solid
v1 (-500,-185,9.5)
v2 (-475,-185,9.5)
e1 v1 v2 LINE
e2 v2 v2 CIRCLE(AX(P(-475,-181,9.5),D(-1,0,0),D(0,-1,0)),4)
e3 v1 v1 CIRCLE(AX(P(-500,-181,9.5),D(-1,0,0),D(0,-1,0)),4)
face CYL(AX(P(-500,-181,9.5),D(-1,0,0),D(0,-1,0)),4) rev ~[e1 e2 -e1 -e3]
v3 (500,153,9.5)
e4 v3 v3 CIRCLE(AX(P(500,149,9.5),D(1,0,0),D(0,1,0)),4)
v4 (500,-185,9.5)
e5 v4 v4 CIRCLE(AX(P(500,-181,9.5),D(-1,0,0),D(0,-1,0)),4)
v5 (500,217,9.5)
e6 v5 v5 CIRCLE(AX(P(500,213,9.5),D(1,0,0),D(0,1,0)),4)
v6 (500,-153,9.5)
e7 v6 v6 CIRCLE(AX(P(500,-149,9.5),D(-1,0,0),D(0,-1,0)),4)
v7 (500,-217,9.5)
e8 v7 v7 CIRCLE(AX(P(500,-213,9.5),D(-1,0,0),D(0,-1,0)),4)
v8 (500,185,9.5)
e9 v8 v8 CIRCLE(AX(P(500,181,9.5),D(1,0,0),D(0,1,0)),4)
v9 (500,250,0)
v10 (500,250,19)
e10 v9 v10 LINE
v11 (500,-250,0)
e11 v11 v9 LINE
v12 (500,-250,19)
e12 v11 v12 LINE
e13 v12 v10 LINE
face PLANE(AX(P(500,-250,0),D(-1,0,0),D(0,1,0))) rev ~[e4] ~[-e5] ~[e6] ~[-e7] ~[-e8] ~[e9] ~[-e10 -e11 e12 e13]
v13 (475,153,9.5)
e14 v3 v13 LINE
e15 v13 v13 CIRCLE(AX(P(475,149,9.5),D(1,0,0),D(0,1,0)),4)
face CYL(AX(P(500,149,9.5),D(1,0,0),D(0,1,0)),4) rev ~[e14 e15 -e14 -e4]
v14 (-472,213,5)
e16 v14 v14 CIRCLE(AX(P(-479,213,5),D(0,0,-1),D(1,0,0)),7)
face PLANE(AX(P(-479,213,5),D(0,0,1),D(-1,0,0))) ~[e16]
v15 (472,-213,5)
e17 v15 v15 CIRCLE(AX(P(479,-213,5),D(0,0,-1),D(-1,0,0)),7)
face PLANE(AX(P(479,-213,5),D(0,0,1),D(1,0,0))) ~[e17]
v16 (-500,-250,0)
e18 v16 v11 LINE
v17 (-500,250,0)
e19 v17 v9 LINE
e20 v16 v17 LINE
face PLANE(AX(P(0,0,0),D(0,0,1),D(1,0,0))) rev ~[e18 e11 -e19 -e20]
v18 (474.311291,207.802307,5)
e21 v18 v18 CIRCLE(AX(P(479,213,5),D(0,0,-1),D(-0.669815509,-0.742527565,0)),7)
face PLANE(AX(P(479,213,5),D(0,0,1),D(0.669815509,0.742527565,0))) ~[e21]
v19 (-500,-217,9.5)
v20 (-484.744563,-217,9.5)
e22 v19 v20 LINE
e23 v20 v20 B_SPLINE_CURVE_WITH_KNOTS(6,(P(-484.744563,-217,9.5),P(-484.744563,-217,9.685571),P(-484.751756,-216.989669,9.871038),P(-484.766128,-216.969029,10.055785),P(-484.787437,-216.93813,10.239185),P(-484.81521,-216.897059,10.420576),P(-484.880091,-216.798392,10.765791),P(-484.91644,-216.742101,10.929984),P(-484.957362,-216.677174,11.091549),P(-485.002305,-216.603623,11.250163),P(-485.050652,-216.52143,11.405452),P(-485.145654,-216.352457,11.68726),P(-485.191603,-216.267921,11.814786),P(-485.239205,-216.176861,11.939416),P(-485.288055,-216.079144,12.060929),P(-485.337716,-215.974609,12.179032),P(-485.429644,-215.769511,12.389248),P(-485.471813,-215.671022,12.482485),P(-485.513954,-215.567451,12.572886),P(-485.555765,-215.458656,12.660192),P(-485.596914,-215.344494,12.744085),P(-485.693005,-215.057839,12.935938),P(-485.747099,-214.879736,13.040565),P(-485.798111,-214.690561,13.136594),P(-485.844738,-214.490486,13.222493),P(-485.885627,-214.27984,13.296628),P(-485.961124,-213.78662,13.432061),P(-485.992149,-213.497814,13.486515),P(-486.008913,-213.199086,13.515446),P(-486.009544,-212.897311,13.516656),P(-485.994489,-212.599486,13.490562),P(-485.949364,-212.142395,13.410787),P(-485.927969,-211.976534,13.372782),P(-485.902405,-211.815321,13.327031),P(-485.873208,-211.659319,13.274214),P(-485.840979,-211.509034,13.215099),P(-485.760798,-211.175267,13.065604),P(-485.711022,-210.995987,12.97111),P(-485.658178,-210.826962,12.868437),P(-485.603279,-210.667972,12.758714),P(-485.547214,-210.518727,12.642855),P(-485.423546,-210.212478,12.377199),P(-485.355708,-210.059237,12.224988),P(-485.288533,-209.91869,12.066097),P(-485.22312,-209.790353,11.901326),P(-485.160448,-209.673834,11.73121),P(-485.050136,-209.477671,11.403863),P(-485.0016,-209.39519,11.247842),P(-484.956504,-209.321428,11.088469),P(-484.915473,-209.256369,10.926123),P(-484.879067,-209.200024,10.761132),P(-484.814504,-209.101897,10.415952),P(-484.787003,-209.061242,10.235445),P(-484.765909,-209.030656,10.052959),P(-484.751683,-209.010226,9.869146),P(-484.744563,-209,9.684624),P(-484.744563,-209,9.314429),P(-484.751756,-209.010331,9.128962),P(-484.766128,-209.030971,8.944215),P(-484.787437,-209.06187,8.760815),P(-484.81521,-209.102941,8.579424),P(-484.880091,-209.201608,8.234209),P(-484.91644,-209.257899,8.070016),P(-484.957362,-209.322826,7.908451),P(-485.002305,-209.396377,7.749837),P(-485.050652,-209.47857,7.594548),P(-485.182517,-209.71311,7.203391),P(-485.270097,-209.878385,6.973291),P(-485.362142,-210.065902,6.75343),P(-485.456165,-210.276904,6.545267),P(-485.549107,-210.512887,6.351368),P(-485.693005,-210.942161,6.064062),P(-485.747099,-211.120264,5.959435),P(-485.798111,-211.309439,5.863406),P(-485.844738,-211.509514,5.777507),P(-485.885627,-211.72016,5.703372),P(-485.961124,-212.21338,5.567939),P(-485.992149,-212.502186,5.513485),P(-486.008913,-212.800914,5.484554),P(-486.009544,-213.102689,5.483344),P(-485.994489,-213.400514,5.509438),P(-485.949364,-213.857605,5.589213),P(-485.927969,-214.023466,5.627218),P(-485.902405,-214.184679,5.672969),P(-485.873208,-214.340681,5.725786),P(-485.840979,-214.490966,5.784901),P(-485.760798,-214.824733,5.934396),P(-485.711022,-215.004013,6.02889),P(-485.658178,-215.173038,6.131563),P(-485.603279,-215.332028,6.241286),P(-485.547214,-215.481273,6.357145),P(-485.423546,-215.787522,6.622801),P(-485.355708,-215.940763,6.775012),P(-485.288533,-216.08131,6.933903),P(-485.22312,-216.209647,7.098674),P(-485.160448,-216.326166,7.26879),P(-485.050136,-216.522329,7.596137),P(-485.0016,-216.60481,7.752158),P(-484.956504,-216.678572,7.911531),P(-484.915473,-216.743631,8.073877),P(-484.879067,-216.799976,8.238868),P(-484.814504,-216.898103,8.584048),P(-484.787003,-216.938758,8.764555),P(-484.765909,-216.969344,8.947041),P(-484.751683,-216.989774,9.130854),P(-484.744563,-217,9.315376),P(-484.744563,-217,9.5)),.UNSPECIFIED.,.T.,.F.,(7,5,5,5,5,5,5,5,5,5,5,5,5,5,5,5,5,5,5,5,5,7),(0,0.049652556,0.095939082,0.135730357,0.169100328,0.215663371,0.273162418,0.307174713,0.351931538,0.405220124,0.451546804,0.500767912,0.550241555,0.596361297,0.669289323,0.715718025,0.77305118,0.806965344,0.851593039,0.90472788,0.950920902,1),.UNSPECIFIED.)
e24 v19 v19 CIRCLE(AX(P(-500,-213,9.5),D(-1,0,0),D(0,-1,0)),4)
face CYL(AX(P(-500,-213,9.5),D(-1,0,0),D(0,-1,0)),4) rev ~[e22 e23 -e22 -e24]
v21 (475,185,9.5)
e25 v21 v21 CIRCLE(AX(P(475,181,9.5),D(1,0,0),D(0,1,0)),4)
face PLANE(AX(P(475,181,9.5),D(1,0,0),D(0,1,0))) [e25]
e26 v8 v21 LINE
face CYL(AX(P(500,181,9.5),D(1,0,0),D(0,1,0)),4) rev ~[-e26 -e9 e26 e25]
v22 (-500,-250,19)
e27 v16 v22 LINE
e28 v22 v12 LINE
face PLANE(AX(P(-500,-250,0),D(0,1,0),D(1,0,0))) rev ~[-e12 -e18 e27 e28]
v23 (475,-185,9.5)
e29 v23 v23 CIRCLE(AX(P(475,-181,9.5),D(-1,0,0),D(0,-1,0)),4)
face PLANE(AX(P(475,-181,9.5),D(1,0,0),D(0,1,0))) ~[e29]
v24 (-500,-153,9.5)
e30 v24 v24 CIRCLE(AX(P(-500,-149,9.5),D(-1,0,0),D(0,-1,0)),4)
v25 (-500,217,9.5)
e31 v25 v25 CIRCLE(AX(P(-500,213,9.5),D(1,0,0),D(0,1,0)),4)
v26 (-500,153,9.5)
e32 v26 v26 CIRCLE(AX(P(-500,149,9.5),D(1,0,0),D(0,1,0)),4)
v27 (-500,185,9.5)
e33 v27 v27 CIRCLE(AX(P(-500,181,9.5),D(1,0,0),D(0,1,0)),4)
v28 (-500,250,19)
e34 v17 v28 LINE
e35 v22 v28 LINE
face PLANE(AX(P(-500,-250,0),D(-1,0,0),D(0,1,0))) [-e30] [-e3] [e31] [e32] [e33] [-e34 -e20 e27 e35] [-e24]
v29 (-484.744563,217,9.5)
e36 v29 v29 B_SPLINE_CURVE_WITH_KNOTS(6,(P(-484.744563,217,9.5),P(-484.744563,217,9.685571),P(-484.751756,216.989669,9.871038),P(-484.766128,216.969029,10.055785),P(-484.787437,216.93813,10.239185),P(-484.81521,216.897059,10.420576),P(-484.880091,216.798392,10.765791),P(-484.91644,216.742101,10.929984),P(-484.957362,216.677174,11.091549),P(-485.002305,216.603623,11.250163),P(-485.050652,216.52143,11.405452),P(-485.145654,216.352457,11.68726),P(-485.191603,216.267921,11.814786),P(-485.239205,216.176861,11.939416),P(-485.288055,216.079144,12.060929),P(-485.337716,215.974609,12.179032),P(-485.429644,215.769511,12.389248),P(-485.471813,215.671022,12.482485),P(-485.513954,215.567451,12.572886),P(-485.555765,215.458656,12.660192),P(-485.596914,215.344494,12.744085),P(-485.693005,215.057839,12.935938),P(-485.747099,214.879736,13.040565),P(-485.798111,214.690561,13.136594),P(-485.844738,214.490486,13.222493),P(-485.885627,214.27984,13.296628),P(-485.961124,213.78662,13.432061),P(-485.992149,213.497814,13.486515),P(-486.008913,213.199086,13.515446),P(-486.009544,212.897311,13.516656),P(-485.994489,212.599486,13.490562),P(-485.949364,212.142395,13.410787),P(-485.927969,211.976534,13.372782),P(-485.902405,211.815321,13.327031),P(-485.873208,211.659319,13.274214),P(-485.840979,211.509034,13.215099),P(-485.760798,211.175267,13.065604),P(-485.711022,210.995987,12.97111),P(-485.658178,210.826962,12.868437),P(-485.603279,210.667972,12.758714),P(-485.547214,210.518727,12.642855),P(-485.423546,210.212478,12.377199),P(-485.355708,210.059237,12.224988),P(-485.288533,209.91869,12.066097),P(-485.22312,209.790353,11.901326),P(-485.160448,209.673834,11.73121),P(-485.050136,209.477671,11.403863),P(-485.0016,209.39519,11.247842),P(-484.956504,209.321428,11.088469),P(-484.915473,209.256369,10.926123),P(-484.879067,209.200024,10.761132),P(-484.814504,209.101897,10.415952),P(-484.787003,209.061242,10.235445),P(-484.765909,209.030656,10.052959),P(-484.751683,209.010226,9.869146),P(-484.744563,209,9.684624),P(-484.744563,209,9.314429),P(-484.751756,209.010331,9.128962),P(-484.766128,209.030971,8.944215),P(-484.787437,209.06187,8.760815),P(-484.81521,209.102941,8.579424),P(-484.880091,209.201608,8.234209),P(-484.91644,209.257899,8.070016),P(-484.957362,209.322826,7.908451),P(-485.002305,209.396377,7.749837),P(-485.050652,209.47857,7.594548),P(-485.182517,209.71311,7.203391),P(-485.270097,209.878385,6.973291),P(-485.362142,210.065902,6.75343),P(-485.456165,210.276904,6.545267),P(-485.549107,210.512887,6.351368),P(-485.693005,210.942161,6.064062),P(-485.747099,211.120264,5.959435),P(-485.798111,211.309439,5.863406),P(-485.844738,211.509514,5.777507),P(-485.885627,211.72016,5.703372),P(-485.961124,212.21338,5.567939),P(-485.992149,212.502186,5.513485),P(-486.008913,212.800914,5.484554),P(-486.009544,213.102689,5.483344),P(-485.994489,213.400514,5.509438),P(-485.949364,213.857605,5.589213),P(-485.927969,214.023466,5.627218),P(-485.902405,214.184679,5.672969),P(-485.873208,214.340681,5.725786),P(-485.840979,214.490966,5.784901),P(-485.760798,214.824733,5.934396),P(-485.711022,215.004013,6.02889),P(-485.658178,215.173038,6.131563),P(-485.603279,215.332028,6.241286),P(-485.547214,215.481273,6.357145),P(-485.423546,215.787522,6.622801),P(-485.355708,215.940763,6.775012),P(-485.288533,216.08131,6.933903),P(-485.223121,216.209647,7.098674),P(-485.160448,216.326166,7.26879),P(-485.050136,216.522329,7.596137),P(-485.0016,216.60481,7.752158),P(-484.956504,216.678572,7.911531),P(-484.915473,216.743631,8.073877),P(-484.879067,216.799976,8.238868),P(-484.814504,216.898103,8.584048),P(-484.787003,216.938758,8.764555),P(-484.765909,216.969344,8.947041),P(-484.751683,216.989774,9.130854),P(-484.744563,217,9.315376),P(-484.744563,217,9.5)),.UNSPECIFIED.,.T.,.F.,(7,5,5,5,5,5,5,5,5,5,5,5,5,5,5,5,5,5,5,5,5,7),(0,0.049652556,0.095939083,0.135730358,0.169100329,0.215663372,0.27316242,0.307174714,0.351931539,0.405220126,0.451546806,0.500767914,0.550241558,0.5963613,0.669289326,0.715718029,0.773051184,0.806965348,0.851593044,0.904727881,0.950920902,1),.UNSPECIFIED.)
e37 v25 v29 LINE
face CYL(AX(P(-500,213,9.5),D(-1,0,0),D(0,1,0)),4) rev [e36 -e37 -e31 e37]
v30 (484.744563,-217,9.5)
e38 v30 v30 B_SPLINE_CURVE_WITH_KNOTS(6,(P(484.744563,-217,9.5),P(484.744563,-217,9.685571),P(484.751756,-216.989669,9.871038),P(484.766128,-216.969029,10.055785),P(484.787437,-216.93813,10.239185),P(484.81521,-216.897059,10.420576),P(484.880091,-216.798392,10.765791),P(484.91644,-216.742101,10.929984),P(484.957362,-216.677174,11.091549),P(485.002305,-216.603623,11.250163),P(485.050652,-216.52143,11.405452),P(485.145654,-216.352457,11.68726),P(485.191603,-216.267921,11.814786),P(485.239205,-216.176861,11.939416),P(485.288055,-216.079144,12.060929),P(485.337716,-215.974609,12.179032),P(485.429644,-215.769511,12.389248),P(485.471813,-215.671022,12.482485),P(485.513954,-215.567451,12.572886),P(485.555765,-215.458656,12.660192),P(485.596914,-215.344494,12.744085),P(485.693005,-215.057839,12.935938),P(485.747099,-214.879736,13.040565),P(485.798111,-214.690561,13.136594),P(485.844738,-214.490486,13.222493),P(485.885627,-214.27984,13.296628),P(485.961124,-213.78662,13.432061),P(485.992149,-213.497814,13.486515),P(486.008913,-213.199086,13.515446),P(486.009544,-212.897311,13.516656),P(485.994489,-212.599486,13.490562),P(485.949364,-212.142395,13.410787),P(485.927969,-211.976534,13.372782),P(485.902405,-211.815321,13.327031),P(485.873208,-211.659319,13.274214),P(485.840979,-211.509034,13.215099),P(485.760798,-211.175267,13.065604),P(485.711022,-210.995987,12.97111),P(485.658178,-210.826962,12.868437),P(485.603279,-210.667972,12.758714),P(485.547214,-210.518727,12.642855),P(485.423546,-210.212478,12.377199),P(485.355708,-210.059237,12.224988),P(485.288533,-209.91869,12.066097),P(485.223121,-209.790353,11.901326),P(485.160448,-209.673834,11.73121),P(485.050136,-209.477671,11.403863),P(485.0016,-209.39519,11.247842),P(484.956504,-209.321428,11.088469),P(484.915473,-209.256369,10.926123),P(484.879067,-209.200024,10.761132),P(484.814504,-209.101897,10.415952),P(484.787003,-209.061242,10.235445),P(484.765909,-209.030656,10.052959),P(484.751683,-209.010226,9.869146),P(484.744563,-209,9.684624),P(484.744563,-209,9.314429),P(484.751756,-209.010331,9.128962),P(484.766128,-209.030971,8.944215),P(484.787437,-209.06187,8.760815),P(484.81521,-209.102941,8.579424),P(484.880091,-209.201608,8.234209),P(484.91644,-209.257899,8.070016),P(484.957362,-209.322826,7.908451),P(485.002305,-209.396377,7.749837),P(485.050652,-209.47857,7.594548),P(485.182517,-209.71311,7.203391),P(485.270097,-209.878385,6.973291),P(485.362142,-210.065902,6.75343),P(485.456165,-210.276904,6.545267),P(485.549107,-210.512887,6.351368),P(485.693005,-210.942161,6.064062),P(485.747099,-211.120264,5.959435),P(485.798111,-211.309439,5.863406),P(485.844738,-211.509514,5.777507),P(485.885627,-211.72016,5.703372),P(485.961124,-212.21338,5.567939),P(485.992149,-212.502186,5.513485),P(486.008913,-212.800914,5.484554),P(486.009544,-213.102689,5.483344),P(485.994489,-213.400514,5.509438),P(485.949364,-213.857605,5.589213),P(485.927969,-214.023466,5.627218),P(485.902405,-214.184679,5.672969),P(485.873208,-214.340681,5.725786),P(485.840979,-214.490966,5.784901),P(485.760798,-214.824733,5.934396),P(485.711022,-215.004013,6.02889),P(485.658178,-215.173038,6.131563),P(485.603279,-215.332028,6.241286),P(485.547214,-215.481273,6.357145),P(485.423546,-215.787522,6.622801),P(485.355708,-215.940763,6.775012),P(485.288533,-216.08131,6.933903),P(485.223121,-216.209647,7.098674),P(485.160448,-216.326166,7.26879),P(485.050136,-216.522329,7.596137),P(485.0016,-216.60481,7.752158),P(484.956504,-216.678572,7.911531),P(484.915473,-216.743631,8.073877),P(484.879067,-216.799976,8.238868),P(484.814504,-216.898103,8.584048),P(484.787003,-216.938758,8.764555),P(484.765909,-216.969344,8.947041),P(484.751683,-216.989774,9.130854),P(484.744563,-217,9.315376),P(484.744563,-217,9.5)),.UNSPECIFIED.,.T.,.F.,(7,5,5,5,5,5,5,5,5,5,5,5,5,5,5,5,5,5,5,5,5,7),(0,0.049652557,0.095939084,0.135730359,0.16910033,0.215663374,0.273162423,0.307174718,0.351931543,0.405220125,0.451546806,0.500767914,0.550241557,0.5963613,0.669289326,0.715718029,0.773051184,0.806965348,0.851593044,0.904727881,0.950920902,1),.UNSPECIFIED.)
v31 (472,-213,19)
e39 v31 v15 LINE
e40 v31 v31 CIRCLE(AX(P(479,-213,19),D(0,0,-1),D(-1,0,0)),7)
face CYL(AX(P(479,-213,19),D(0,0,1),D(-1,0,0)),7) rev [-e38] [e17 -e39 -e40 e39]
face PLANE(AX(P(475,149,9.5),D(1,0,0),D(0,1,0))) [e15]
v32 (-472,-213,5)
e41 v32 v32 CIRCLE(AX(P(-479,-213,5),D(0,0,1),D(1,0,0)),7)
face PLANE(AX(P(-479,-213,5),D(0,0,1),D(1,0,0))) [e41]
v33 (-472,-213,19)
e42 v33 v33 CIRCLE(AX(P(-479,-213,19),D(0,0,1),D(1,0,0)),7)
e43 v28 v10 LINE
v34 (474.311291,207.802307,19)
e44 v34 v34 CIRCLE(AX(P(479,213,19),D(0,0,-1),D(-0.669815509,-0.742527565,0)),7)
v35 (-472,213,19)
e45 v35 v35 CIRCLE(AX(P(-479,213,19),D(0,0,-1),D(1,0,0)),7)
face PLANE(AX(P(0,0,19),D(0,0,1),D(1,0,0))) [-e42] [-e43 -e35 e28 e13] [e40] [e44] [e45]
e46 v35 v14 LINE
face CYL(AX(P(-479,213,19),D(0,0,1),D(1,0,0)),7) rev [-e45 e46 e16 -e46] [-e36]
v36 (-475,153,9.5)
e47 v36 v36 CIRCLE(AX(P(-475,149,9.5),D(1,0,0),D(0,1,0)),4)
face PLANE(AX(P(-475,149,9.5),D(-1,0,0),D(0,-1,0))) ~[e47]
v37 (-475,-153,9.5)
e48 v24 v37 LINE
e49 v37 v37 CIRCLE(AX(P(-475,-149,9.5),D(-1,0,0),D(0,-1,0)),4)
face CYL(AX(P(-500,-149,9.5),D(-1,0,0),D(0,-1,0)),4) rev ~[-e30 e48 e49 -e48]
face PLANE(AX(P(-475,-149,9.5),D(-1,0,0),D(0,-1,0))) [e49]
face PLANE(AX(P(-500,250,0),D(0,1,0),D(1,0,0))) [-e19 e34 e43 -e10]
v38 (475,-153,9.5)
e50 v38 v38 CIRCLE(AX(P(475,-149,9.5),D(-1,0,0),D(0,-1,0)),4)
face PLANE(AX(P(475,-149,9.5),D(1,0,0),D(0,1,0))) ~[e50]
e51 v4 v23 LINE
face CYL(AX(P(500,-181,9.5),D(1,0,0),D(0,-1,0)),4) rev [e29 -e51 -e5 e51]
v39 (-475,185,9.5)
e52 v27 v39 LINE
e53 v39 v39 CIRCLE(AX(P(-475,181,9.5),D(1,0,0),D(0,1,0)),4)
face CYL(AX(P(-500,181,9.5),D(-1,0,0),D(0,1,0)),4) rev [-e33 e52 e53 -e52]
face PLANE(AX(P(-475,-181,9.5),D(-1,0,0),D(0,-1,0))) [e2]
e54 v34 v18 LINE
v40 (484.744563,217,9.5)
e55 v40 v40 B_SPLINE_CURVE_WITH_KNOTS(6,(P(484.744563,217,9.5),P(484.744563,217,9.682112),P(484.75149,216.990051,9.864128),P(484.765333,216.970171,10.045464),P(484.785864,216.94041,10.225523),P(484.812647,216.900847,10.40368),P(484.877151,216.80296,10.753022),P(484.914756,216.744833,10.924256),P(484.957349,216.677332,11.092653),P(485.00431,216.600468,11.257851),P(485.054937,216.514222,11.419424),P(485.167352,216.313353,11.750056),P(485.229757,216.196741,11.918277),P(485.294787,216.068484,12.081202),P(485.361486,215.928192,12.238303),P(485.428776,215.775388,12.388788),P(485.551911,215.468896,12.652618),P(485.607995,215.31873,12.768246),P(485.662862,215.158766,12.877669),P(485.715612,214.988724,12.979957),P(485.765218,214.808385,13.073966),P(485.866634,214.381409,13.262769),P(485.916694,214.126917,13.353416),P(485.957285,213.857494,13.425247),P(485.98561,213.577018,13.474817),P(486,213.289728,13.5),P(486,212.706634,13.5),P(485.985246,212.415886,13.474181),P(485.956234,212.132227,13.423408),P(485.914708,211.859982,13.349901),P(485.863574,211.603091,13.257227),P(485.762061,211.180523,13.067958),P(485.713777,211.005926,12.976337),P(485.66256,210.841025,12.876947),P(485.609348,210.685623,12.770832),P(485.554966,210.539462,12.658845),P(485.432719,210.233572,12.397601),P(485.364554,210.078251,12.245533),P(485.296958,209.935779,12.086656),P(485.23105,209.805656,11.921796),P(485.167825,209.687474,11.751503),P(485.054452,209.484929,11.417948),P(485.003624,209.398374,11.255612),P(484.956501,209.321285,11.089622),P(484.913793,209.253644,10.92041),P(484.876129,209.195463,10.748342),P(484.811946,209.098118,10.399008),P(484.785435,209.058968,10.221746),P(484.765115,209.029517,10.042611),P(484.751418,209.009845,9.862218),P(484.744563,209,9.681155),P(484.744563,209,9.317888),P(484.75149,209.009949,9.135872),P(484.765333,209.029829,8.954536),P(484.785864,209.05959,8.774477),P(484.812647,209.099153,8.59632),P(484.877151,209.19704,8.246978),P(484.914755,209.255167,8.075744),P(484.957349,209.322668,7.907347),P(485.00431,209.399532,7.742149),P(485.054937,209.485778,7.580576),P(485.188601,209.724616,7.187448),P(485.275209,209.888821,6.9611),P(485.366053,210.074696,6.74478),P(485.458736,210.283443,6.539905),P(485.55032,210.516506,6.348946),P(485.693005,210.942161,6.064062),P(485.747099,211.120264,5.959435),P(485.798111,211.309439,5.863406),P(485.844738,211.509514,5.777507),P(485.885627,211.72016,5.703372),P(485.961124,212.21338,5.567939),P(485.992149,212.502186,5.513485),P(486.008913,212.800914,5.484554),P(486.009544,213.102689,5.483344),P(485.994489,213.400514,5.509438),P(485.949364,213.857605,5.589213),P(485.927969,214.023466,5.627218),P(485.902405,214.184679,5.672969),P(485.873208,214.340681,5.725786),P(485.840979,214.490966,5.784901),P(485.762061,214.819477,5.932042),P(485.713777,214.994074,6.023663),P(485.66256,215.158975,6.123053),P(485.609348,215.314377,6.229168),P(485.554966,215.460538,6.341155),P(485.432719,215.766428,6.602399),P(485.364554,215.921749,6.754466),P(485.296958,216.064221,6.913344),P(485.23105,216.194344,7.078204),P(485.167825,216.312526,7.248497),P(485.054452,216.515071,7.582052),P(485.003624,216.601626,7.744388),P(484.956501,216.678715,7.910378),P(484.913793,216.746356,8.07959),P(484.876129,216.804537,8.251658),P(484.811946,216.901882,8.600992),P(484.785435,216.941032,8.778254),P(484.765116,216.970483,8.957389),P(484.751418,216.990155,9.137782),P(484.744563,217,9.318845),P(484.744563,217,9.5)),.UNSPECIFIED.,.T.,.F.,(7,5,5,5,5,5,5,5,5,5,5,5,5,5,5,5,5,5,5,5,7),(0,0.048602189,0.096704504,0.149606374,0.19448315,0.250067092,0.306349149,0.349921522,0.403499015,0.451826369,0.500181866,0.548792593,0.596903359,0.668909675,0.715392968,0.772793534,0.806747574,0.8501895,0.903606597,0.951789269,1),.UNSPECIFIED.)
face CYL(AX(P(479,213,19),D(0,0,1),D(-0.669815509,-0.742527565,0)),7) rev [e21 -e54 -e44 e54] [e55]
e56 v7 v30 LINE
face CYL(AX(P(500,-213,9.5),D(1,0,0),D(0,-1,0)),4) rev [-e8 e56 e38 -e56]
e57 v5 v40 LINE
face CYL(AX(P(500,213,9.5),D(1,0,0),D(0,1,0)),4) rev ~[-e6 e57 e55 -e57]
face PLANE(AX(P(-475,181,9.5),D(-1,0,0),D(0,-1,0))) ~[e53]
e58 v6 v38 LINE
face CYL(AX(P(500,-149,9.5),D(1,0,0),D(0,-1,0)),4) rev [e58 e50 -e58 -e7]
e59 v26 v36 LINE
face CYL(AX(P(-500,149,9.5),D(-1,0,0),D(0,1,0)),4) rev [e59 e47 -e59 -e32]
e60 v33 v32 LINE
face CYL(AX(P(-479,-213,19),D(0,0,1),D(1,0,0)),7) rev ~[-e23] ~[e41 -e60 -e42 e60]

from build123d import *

# Parameters (mm, degrees)
F0_W             = 1000
F0_H             = 500
F1_DEPTH         = 19
F2_R             = 7
F3_DEPTH         = 14
F4_R             = 4
F5_DEPTH         = 25
F5_COPIES2_COUNT = 2


# Not quite as in the source:
# - a pattern or mirror of a feature is missing from the dataset's text; its kind, count and spacing are read off the source's solid


with BuildPart() as f1:
    # F0 (on Top) → F1 (new body)
    with BuildSketch(Plane.XY):
        Rectangle(F0_W, F0_H)
    extrude(amount=F1_DEPTH)

    # F2 (on face) → F3 (cut)
    with BuildSketch(Plane.XY.offset(19)):
        with Locations((-479, -213)):
            Circle(F2_R)
    f3 = extrude(amount=-F3_DEPTH, mode=Mode.SUBTRACT)

    # F3_copies: F3 across plane
    add(f3.mirror(Plane(origin=(0, 0, 0), x_dir=(-0.4063154508, 0.9137328682, 0), z_dir=(0.9137328682, 0.4063154508, 0))), mode=Mode.SUBTRACT)

    # F3_copies1: F3 across plane
    add(f3.mirror(Plane(origin=(0, 0, 0), x_dir=(0, 0, 1), z_dir=(1, 0, 0))), mode=Mode.SUBTRACT)

    # F3_copies2: F3 across plane
    add(f3.mirror(Plane.ZX), mode=Mode.SUBTRACT)

    # F4 (on face) → F5 (cut)
    with BuildSketch(Plane(origin=(-500, 0, 0), x_dir=(0, -1, 0), z_dir=(-1, 0, 0))):
        with Locations((213, 9.5)):
            Circle(F4_R)
        with Locations((181, 9.5)):
            Circle(F4_R)
        with Locations((149, 9.5)):
            Circle(F4_R)
    f5 = extrude(amount=-F5_DEPTH, mode=Mode.SUBTRACT)

    # F5_copies: F5 across plane
    add(f5.mirror(Plane(origin=(0, 0, 0), x_dir=(0, 0, 1), z_dir=(1, 0, 0))), mode=Mode.SUBTRACT)

    # F5_copies1: F5 across plane
    add(f5.mirror(Plane.ZX), mode=Mode.SUBTRACT)

    # F5_copies2: F5 ×2 about axis
    f5_copies2_axis = Axis((0, 0, 0), (0, 0, 1))
    for i in range(1, F5_COPIES2_COUNT):
        add(f5.rotate(f5_copies2_axis, i * 360 / F5_COPIES2_COUNT), mode=Mode.SUBTRACT)


solid = f1.part
